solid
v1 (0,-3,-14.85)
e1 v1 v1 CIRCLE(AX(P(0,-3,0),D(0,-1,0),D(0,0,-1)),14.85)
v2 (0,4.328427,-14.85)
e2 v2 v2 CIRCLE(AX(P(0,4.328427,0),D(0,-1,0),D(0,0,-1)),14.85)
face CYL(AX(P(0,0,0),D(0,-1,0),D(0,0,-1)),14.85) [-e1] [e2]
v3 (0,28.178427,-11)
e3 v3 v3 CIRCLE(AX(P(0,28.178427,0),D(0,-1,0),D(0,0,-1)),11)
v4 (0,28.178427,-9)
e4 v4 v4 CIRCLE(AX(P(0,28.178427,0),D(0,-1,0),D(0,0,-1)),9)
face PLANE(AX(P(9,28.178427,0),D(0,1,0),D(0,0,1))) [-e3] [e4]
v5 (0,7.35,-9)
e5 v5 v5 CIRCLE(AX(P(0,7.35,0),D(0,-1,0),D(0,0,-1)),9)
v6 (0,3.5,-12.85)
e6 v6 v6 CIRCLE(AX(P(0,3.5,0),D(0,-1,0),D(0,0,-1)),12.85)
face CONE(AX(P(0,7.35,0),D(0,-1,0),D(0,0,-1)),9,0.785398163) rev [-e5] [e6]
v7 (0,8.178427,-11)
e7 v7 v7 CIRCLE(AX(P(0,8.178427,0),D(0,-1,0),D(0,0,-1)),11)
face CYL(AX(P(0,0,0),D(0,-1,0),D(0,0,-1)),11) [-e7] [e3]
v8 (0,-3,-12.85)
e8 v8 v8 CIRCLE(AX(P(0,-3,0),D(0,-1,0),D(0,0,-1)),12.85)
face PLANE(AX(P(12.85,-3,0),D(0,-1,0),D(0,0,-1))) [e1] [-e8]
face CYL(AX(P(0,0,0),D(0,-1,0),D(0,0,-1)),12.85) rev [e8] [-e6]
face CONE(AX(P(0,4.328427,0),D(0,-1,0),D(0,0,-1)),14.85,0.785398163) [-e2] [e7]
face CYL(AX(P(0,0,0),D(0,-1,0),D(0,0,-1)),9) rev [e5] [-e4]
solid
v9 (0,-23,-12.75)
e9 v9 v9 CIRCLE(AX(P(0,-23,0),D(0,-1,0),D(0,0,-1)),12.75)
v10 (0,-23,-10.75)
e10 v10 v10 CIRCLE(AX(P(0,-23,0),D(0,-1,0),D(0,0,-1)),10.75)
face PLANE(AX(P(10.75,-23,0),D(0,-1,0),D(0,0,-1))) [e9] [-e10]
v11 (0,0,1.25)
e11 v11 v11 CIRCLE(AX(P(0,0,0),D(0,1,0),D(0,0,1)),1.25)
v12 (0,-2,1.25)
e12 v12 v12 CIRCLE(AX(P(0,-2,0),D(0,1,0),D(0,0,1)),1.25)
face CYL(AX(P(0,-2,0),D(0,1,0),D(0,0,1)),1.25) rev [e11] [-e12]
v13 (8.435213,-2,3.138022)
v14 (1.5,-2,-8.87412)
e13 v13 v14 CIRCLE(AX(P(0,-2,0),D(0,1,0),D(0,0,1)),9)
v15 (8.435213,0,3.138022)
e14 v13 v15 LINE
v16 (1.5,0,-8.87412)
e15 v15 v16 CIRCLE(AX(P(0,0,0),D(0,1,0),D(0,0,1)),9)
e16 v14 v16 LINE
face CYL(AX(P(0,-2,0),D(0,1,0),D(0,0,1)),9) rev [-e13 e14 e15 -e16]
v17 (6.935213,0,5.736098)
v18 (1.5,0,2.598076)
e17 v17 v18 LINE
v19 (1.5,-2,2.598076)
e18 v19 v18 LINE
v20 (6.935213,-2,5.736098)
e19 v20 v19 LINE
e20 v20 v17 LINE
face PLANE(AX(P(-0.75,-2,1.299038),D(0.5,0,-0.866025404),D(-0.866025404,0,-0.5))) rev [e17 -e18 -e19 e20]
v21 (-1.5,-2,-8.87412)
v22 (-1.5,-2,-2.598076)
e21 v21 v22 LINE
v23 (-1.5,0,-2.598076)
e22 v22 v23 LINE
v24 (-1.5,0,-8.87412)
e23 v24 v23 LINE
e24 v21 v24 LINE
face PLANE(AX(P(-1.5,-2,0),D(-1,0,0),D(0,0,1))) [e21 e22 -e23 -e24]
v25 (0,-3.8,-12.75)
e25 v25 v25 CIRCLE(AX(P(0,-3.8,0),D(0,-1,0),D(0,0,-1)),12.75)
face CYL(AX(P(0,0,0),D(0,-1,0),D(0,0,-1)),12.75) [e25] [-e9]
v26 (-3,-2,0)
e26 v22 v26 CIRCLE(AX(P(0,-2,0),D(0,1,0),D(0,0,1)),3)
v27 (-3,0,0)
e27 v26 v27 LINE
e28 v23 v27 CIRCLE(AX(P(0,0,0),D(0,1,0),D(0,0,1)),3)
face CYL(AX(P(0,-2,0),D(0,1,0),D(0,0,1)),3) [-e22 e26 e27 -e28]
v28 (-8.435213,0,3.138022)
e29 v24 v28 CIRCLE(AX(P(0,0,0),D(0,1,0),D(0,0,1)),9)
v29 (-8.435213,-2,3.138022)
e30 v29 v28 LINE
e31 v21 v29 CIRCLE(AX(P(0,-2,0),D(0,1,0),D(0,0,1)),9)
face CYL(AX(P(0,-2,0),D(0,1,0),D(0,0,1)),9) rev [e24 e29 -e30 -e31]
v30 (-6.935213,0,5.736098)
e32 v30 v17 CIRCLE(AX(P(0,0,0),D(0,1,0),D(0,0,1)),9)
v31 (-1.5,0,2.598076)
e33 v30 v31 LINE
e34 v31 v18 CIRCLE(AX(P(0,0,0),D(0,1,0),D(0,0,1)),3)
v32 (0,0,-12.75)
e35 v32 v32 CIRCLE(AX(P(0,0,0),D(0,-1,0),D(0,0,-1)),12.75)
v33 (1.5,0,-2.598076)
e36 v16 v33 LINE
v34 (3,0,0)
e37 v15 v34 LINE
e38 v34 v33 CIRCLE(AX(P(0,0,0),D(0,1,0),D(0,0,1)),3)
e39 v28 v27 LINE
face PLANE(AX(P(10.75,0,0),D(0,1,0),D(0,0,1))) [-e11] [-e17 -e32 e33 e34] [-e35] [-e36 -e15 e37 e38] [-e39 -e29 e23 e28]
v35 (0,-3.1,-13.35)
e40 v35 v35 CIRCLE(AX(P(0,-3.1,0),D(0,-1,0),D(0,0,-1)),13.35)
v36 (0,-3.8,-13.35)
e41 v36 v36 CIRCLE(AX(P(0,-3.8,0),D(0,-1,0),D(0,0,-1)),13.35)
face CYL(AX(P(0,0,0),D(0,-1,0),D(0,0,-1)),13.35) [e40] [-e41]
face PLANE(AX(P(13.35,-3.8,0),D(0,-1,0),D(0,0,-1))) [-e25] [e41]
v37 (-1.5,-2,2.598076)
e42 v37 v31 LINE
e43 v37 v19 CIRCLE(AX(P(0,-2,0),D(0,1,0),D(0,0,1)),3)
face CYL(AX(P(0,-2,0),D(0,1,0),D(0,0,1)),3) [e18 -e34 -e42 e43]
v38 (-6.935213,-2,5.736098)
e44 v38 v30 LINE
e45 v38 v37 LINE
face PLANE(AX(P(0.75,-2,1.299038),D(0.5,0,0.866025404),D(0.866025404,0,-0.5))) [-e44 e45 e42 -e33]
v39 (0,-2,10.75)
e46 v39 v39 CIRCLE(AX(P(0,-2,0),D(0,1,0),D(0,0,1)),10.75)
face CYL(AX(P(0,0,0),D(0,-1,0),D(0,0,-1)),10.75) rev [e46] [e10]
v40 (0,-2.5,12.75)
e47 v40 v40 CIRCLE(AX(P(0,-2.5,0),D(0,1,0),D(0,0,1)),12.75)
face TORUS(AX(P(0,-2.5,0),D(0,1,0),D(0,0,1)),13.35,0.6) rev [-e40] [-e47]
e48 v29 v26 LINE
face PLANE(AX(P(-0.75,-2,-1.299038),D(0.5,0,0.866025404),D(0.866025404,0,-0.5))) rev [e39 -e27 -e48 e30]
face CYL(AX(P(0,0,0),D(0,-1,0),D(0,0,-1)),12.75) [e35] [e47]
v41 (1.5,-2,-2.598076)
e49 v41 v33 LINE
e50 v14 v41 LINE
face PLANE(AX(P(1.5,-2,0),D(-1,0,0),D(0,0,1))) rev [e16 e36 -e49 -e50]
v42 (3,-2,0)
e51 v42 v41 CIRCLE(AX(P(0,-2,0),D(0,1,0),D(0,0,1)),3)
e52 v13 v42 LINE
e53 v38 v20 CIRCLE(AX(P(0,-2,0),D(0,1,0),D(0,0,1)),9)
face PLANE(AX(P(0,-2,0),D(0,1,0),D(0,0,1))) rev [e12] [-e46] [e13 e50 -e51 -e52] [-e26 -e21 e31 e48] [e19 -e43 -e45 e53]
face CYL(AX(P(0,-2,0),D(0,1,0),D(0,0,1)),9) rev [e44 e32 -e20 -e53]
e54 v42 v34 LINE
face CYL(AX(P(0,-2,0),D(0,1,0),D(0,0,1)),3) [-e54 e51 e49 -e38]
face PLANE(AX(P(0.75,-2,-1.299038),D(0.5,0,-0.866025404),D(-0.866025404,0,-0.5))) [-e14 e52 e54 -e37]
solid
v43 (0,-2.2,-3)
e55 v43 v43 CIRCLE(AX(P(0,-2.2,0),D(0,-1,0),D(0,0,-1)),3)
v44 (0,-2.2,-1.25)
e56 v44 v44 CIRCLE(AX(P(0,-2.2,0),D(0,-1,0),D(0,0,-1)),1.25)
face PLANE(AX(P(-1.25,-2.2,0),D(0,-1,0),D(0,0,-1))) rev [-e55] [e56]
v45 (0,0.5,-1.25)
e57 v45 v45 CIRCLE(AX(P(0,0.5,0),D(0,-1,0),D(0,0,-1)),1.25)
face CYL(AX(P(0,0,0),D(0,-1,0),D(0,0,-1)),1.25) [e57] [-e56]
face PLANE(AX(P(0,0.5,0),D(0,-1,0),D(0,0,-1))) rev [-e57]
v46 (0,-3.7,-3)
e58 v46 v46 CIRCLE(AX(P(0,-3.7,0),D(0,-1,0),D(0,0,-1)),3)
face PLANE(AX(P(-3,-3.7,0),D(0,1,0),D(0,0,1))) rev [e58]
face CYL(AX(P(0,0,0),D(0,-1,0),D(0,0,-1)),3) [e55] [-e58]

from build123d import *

# Parameters (mm, degrees)
SKETCH3_R           = 10.75
SKETCH3_R_2         = 1.25
BOSS_EXTRUDE1_DEPTH = 2
FILLET1_R           = 0.6


with BuildPart() as part:
    # Sketch1 → Revolve1 (revolve)
    with BuildSketch(Plane.XY, mode=Mode.PRIVATE) as revolve1_sk:
        Polygon((12.85, 3.5), (9, 7.35), (9, 28.178427125), (11, 28.178427125), (11, 8.178427125), (14.85, 4.328427125), (14.85, -3), (12.85, -3), align=None)
        Polygon((10.75, 0), (12.75, 0), (12.75, -1.5), (12.75, -3.1), (13.35, -3.1), (13.35, -3.8), (12.75, -3.8), (12.75, -23), (10.75, -23), align=None)
    revolve(revolve1_sk.sketch.rotate(Axis((0, 0, 0), (0, 1, 0)), 90), axis=Axis((0, 0, 0), (0, 1, 0)))

    # Sketch3 → Boss-Extrude1 (add)
    with BuildSketch(Plane(origin=(0, 0, 0), x_dir=(1, 0, 0), z_dir=(0, 1, 0))):
        with Locations(Location((0, 0, 0), (0, 0, 90))):
            Circle(SKETCH3_R)
        with Locations(Location((0, 0, 0), (0, 0, 270))):
            Circle(SKETCH3_R_2, mode=Mode.SUBTRACT)
        with BuildLine():
            Line((-1.5, 8.874119675), (-1.5, 2.598076211))
            ThreePointArc((-1.5, 2.598076211), (-2.598076211, 1.5), (-3, 0))
            Line((-3, 0), (-8.435213074, -3.138021732))
            ThreePointArc((-8.435213074, -3.138021732), (-7.794228634, 4.5), (-1.5, 8.874119675))
        make_face(mode=Mode.SUBTRACT)
        with BuildLine():
            Line((1.5, 8.874119675), (1.5, 2.598076211))
            ThreePointArc((1.5, 2.598076211), (2.598076211, 1.5), (3, 0))
            Line((3, 0), (8.435213074, -3.138021732))
            ThreePointArc((8.435213074, -3.138021732), (7.794228634, 4.5), (1.5, 8.874119675))
        make_face(mode=Mode.SUBTRACT)
        with BuildLine():
            Line((6.935213074, -5.736097943), (1.5, -2.598076211))
            ThreePointArc((1.5, -2.598076211), (0, -3), (-1.5, -2.598076211))
            Line((-1.5, -2.598076211), (-6.935213074, -5.736097943))
            ThreePointArc((-6.935213074, -5.736097943), (0, -9), (6.935213074, -5.736097943))
        make_face(mode=Mode.SUBTRACT)
    extrude(amount=-BOSS_EXTRUDE1_DEPTH)

    # Fillet1
    fillet1_edges = [part.edges().sort_by_distance(p)[0] for p in [
        (0, -3.1, 12.75),
    ]]
    fillet(fillet1_edges, radius=FILLET1_R - 0.0001)  # a hair under: the kernel refuses the full size


with BuildPart() as body_2:
    # Sketch5 → Revolve2 (revolve)
    with BuildSketch(Plane.XY, mode=Mode.PRIVATE) as revolve2_sk:
        Polygon((-1.25, 0.5), (-1.25, -2.2), (-3, -2.2), (-3, -3.7), (0, -3.7), (0, 0.5), align=None)
    revolve(revolve2_sk.sketch.rotate(Axis((0, 0, 0), (0, 1, 0)), 270), axis=Axis((0, 0, 0), (0, 1, 0)))


solid = Compound([part.part, body_2.part])
